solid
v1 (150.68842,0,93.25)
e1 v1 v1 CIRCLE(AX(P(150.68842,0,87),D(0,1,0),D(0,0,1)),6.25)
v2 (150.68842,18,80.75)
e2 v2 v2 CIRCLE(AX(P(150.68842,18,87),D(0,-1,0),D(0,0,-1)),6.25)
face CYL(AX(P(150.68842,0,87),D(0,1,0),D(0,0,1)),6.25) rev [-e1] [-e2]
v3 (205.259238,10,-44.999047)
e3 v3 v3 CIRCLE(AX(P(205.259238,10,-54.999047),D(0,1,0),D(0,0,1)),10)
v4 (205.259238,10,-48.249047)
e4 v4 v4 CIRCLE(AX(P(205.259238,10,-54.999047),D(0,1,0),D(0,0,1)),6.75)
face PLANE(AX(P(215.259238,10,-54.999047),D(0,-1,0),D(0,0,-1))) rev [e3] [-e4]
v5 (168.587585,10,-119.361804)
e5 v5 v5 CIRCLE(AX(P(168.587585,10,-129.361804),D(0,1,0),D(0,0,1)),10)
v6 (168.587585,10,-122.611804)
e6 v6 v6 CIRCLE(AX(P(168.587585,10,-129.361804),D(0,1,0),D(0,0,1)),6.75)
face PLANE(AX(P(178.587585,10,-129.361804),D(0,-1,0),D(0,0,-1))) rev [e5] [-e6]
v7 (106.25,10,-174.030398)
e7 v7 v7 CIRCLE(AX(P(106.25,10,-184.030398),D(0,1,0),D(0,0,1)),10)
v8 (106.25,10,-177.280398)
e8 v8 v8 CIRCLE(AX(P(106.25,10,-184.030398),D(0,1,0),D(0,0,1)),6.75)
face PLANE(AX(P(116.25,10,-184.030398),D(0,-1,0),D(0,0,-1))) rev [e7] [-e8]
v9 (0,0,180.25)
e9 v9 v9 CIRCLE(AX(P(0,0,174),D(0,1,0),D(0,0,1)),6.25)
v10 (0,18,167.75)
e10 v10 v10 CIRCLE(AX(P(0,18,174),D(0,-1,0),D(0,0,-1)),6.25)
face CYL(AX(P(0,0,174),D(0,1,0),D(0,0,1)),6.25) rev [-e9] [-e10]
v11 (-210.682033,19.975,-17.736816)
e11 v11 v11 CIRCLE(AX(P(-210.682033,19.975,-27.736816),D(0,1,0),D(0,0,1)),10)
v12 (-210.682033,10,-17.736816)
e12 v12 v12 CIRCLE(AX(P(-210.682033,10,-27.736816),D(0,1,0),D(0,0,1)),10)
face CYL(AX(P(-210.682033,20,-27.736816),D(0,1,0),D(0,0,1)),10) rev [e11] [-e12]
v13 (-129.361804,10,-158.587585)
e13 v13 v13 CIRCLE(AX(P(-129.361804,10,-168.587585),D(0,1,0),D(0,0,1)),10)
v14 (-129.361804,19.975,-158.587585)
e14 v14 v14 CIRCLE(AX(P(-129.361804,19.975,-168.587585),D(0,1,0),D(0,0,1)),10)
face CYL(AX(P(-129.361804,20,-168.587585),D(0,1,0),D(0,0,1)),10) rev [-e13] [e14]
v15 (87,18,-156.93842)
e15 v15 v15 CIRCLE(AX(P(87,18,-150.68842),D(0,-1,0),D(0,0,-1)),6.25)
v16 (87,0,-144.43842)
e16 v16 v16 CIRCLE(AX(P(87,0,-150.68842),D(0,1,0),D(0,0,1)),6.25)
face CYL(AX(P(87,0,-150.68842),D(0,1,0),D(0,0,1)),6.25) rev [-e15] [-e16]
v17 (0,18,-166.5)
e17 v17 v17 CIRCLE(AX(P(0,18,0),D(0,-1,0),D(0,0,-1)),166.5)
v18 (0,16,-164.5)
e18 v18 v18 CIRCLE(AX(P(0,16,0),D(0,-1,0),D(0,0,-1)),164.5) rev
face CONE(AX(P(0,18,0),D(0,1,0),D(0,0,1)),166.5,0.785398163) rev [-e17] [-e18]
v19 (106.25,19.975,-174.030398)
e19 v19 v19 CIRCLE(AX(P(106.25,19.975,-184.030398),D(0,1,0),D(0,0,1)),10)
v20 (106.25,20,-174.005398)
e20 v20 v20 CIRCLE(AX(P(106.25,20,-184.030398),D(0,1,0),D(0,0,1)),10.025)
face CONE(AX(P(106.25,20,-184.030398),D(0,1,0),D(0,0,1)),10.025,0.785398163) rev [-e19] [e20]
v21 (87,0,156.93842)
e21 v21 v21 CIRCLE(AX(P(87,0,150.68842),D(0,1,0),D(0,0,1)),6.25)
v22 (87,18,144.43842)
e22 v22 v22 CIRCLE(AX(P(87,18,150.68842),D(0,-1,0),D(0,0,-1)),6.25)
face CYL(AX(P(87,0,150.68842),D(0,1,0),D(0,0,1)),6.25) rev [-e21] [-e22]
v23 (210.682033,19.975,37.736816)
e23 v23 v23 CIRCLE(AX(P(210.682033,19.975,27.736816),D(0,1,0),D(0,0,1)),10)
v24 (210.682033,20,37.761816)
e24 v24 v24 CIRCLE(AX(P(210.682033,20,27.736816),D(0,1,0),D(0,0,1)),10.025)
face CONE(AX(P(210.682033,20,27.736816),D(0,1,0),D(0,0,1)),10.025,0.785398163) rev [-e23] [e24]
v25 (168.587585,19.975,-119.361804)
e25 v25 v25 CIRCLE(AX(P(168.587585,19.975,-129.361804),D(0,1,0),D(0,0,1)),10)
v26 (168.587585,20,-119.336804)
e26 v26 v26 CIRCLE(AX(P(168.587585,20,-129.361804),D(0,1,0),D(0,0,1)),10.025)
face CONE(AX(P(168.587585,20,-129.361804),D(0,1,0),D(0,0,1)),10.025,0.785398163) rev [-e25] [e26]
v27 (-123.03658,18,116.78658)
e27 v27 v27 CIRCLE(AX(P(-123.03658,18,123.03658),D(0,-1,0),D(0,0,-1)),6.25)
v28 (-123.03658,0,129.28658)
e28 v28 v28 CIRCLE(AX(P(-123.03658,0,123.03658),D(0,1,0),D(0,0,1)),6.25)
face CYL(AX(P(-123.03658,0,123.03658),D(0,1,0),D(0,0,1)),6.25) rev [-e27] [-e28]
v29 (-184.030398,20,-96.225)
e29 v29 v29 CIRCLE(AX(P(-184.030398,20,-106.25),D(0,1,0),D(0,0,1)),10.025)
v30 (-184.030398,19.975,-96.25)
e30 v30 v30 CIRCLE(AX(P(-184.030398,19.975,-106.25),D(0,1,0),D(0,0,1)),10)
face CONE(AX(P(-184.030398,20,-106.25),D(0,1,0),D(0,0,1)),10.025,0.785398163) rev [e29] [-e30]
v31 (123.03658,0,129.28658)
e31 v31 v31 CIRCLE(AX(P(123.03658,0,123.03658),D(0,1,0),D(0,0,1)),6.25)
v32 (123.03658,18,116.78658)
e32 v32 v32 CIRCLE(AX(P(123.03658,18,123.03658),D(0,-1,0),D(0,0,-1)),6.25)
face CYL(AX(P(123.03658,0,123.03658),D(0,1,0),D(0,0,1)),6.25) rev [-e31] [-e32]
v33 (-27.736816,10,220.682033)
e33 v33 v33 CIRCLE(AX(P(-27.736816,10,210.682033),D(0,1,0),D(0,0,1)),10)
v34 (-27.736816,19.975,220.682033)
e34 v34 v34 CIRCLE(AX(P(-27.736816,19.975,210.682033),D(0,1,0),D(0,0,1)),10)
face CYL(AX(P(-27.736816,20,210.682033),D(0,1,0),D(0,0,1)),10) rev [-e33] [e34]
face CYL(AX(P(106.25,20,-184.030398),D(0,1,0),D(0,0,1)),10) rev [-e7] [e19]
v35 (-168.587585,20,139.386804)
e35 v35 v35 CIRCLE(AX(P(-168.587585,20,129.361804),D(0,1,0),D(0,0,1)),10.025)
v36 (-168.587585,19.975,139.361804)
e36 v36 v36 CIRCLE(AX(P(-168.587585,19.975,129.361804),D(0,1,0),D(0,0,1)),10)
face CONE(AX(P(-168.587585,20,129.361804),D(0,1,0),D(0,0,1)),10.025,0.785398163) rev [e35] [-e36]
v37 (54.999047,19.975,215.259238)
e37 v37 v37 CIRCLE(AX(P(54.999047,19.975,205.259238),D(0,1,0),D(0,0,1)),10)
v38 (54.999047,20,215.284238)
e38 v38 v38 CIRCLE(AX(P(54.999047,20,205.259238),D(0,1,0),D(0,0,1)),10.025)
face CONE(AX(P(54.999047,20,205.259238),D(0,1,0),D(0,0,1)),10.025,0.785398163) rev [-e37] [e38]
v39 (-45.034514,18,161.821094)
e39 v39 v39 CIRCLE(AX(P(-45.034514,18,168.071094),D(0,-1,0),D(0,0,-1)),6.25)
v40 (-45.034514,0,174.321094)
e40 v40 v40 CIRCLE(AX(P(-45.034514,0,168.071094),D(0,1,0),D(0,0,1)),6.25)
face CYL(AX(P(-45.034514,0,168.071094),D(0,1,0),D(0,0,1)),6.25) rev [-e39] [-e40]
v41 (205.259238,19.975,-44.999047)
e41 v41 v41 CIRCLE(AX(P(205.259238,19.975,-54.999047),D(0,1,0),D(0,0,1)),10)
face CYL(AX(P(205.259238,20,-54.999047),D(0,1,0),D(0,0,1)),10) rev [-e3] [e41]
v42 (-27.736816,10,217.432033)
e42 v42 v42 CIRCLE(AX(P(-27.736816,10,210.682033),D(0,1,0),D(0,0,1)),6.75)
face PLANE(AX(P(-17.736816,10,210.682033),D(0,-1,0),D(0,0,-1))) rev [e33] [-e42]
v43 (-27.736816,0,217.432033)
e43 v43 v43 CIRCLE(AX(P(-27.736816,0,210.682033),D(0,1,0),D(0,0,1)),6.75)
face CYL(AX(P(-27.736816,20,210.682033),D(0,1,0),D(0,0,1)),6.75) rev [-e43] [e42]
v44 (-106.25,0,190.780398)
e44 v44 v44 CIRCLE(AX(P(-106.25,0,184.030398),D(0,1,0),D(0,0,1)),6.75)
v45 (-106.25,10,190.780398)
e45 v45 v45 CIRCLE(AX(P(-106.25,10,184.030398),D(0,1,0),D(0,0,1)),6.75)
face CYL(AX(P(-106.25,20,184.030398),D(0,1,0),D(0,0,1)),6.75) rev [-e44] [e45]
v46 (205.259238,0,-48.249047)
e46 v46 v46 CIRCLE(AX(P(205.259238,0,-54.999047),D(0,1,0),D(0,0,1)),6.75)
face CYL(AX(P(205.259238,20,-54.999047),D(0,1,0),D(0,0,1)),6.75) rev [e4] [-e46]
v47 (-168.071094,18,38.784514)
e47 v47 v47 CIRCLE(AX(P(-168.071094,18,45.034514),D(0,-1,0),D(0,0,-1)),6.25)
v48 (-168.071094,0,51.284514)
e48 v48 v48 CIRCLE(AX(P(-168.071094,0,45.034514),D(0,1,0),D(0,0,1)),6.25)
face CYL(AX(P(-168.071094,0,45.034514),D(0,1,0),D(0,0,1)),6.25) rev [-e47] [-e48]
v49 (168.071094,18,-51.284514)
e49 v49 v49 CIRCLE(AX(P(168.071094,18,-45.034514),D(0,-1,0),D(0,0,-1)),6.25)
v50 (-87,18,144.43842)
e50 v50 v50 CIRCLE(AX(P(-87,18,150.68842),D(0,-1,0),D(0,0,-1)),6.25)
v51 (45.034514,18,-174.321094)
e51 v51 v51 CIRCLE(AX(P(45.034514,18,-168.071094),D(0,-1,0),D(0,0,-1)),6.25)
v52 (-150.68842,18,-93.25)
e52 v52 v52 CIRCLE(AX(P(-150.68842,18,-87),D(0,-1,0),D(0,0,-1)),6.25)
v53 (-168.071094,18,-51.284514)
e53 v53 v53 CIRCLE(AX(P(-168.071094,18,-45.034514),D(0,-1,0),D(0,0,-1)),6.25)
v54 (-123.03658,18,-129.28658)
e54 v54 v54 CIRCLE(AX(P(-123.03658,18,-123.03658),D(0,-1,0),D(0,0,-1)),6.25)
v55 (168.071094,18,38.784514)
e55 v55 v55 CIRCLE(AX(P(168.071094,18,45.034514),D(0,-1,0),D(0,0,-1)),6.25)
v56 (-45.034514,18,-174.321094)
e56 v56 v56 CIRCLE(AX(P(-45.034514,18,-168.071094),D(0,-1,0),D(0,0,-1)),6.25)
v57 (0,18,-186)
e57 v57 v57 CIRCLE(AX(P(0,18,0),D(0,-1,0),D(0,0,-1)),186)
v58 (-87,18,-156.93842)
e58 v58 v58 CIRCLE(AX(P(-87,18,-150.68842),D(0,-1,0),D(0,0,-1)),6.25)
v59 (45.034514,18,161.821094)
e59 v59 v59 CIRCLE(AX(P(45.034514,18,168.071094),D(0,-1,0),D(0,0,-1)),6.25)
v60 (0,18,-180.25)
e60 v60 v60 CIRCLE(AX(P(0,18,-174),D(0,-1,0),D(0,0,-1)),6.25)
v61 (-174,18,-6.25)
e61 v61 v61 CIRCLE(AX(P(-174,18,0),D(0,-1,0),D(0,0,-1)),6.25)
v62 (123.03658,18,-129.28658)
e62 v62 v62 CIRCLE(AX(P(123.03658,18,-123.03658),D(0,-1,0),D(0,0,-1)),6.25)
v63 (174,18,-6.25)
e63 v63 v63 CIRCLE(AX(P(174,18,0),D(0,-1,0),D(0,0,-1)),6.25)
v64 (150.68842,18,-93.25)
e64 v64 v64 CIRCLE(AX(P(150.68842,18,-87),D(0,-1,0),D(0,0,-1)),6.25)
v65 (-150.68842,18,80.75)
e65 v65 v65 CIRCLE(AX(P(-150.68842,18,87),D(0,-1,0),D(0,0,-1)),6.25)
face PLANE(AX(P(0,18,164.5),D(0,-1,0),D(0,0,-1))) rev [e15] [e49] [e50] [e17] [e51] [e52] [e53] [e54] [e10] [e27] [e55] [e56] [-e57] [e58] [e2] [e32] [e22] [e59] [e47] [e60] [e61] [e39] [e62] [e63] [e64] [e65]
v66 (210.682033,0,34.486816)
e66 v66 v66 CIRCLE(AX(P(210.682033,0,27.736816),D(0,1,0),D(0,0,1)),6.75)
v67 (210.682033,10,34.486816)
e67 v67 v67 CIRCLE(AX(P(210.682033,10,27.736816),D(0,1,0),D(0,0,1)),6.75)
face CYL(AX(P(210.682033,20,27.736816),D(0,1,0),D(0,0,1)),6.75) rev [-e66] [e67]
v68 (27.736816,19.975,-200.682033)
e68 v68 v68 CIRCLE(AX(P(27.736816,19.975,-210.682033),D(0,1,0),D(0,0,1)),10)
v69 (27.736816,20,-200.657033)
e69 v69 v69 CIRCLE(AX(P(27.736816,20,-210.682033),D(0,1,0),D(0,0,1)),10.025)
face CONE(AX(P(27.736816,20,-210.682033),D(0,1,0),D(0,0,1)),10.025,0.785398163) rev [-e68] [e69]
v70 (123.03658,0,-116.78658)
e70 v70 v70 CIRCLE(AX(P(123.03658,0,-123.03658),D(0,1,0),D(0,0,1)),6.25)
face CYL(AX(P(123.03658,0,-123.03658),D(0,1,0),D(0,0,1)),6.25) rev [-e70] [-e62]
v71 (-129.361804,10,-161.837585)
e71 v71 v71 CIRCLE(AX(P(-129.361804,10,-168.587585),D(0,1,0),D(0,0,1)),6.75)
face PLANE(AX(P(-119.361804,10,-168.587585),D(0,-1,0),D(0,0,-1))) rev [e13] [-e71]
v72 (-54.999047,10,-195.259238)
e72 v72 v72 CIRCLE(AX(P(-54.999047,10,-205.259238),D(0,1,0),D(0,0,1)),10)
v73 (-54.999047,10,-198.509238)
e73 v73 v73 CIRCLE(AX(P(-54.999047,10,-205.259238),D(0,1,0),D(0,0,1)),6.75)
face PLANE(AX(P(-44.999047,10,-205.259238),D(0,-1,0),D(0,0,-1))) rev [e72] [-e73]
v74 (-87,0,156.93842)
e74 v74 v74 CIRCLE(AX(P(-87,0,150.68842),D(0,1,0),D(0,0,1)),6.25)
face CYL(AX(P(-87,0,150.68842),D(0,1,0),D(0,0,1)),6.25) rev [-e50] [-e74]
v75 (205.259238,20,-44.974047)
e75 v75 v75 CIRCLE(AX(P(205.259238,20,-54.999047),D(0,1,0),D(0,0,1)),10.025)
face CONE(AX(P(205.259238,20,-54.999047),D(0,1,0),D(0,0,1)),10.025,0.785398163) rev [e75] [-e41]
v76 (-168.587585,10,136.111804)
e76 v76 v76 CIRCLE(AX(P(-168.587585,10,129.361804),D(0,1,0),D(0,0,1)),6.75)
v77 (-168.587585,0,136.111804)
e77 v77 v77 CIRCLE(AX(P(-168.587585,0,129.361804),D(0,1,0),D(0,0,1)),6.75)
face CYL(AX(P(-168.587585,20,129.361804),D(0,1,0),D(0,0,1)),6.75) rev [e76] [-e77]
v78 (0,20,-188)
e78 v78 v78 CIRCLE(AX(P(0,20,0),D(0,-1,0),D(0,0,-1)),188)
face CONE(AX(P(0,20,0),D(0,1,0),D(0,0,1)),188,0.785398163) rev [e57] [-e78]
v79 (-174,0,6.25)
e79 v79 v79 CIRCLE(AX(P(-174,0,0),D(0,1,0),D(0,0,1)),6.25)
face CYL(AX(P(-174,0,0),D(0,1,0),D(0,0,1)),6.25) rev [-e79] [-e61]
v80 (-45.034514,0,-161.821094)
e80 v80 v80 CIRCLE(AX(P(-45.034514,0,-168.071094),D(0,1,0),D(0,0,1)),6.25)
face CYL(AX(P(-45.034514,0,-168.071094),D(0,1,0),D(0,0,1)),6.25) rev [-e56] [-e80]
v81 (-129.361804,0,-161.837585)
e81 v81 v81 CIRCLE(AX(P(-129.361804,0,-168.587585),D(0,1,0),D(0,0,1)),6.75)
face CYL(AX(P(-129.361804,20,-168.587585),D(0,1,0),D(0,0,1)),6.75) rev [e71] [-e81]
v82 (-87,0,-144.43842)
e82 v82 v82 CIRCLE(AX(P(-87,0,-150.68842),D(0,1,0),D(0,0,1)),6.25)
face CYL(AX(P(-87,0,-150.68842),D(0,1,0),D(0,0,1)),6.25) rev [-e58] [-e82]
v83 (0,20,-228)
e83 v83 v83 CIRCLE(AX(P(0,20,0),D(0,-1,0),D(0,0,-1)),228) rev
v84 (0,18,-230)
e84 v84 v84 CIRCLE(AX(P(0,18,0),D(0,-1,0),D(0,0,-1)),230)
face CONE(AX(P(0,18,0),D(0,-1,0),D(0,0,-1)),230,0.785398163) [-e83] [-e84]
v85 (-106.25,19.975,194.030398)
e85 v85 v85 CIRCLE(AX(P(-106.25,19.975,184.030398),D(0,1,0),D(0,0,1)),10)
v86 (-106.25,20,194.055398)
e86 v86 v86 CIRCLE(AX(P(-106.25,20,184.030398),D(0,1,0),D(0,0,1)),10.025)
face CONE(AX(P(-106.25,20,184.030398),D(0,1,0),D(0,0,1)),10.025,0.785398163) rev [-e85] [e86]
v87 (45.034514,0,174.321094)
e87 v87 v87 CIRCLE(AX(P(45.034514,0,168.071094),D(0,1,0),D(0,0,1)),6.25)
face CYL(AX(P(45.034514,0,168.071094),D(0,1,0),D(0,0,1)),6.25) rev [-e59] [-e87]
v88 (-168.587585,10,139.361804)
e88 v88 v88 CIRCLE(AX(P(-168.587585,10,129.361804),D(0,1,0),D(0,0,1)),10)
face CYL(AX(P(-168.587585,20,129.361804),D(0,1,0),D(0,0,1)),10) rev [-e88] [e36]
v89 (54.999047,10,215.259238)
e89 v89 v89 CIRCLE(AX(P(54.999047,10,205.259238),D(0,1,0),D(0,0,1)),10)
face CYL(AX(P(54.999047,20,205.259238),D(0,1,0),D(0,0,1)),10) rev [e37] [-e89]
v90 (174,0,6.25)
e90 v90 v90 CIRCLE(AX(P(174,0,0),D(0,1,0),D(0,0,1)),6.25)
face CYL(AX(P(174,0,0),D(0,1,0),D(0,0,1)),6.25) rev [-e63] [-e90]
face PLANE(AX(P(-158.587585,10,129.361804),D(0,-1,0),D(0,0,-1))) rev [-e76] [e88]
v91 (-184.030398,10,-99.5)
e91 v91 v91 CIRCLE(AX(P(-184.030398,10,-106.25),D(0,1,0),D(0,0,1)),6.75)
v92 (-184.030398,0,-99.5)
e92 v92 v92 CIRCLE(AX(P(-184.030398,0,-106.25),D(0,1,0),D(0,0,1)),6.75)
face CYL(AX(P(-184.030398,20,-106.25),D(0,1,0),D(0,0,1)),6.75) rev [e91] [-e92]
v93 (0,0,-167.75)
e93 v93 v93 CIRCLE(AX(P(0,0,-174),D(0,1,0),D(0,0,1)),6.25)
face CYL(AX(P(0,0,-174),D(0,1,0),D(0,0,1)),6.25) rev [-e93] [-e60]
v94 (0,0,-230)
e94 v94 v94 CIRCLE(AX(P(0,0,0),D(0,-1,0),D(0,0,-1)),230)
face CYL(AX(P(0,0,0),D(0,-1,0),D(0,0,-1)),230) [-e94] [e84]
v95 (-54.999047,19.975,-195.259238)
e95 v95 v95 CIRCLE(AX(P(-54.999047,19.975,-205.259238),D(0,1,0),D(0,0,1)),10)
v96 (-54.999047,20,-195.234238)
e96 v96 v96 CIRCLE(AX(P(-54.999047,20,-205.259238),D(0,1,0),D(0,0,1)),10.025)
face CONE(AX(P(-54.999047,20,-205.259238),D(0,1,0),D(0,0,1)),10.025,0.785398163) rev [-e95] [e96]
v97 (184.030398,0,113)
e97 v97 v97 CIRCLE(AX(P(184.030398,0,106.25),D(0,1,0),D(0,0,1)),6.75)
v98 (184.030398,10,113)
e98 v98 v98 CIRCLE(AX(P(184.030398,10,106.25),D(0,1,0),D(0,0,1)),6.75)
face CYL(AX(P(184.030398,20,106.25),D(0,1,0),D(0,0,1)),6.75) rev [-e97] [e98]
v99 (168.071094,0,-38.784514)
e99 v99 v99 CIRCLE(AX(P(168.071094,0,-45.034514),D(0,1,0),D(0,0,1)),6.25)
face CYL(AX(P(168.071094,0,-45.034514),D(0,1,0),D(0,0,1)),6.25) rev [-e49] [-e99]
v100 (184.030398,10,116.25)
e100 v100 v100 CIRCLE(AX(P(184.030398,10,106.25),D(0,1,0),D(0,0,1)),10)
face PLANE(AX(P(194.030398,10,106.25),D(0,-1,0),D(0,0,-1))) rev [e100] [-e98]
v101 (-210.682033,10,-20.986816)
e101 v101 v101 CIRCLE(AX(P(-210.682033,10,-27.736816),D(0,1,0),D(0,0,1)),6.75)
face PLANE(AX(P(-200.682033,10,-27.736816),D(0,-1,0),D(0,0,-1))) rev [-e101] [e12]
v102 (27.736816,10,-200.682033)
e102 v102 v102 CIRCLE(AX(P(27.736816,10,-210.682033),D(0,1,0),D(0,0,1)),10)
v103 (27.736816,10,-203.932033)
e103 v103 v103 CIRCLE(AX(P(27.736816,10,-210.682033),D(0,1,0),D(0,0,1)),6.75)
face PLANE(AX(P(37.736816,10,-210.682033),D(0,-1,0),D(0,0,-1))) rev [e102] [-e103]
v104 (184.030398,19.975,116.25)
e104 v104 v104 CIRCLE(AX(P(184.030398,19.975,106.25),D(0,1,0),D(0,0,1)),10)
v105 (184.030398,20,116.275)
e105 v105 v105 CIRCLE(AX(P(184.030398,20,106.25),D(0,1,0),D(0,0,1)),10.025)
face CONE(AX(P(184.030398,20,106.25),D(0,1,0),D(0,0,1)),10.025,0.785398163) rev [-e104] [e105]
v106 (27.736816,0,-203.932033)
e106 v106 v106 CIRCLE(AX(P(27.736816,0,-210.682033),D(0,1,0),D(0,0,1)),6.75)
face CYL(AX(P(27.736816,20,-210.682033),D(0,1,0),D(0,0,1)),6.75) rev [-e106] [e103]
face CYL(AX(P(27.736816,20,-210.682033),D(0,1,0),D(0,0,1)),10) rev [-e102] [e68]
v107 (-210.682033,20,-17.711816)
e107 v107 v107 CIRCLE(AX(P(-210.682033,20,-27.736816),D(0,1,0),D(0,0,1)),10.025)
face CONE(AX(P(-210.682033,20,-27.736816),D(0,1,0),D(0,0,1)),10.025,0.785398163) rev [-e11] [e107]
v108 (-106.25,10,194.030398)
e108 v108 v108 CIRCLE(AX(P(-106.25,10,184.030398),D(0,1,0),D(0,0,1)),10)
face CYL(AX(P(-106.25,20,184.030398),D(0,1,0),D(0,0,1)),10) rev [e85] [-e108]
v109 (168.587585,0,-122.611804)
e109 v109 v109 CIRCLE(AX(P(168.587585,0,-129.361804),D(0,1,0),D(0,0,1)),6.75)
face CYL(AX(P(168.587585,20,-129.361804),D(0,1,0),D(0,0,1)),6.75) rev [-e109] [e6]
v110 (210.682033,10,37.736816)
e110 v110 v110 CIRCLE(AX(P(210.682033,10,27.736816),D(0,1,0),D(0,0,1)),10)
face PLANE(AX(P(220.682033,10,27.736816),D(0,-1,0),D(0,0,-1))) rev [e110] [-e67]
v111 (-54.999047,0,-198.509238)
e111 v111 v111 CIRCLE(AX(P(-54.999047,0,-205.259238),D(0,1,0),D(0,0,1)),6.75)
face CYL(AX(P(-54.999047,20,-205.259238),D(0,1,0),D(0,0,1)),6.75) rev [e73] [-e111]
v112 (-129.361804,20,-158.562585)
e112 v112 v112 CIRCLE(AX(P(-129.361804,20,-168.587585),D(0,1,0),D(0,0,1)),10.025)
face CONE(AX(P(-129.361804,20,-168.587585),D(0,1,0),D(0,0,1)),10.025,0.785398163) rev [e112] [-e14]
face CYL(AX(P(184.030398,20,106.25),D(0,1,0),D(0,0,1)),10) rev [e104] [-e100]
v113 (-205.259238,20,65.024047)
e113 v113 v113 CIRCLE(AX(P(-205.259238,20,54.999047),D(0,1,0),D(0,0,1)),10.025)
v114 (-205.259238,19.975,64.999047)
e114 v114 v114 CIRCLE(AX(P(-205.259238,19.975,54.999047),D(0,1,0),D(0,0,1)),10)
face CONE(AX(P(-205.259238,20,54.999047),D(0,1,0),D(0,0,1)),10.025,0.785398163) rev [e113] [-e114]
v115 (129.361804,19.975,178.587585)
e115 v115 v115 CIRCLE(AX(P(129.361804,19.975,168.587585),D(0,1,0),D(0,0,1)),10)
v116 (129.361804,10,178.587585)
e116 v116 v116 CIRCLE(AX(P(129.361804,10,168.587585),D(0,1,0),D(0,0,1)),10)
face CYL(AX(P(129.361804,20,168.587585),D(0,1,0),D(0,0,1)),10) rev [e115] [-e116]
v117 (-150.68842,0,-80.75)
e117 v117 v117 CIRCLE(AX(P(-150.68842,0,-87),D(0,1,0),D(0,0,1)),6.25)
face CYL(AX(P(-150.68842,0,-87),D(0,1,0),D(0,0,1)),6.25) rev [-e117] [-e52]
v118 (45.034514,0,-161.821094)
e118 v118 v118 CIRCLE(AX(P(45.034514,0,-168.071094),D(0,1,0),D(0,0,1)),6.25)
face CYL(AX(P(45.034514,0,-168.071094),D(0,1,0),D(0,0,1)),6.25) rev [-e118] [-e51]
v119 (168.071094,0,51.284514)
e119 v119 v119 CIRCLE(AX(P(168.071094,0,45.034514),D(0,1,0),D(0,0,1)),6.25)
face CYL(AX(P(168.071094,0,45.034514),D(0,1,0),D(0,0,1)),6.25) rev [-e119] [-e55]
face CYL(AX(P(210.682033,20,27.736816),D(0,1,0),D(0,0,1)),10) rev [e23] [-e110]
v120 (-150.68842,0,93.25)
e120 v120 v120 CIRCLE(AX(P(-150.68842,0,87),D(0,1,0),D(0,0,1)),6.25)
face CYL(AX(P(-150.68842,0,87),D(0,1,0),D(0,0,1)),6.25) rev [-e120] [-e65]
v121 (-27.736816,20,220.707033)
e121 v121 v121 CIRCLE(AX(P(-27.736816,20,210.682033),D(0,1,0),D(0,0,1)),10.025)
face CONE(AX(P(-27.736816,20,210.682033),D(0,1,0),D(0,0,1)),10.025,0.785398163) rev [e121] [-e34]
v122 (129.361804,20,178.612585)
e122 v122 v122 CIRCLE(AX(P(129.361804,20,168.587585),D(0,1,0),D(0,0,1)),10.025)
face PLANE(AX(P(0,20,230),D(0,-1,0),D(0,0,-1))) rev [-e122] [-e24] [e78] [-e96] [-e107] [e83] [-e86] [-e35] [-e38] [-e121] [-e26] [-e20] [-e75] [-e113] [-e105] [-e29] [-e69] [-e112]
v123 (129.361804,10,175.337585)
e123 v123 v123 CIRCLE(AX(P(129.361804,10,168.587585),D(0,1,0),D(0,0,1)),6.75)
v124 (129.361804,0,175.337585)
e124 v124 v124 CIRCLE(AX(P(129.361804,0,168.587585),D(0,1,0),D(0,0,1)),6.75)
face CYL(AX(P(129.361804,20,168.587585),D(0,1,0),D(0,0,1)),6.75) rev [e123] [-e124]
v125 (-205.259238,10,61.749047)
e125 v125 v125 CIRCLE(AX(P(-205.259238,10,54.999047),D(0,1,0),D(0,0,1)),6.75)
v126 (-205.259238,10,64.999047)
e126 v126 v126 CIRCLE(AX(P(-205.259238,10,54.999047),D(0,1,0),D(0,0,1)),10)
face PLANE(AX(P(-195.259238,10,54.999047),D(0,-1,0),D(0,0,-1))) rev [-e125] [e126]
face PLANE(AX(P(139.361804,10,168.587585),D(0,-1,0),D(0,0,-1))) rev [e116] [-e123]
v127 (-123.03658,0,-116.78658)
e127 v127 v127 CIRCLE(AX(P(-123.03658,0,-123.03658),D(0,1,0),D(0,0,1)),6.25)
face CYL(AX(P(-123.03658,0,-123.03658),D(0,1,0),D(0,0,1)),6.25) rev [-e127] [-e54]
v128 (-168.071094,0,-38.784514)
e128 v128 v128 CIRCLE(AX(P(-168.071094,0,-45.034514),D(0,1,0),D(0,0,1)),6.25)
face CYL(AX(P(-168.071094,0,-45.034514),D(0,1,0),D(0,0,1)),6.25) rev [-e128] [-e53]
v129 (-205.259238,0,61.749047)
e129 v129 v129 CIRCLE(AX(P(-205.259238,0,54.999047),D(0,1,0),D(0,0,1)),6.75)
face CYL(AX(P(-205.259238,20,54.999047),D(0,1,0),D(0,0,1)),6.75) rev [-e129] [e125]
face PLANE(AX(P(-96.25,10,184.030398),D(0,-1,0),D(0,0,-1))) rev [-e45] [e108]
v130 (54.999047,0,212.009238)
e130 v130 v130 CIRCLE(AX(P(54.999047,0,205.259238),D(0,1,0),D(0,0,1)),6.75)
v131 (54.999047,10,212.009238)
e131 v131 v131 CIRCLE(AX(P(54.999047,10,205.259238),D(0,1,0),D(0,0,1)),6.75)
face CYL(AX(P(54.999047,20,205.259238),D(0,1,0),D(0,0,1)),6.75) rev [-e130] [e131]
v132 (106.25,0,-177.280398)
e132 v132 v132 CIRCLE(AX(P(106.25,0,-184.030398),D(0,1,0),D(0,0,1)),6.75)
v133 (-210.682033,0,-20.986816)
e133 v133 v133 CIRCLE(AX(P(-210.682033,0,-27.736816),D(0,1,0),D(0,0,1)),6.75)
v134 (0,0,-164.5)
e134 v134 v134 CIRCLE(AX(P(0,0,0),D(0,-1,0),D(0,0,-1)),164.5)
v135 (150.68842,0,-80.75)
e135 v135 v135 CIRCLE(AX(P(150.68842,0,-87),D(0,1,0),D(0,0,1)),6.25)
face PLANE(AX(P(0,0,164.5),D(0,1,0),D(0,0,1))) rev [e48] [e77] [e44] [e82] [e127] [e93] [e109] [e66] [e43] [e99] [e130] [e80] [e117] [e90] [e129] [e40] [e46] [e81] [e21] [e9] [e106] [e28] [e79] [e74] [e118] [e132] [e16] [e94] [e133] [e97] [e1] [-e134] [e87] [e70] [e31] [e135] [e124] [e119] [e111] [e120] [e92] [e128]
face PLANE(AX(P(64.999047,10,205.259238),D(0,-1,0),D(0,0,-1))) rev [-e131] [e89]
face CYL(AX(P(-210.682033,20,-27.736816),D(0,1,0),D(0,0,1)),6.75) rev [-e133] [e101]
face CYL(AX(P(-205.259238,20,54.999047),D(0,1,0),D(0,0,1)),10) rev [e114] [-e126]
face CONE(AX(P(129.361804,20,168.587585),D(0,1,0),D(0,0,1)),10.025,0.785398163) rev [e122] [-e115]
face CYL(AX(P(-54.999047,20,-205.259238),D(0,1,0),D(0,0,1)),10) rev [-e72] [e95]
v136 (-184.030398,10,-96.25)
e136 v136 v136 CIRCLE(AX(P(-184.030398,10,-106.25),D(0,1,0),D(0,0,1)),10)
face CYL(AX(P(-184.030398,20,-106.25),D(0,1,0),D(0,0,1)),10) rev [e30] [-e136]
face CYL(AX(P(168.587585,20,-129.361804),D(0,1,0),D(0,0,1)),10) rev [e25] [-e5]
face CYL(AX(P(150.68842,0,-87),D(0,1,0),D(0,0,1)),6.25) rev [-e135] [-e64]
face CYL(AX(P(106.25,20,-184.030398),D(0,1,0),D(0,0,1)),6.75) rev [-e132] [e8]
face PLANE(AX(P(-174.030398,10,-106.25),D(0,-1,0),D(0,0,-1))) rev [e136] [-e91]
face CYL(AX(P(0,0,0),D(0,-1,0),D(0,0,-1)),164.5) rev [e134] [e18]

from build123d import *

# Parameters (mm, degrees)
SKETCH2_R          = 6.25
CUT_EXTRUDE3_DEPTH = 20
CIRPATTERN1_COUNT  = 16
CHAMFER1_SIZE      = 2


with BuildPart() as part:
    # Sketch1 → Revolve1 (revolve)
    with BuildSketch(Plane(origin=(0, 0, 0), x_dir=(0, 0, -1), z_dir=(1, 0, 0)), mode=Mode.PRIVATE) as revolve1_sk:
        Polygon((-164.5, 0), (-230, 0), (-230, 20), (-186, 20), (-186, 18), (-164.5, 18), align=None)
    revolve(revolve1_sk.sketch.rotate(Axis((0, 0, 0), (0, 1, 0)), 180), axis=Axis((0, 0, 0), (0, 1, 0)))

    # Sketch2 → Cut-Extrude3 (cut)
    with BuildSketch(Plane(origin=(0, 20, 0), x_dir=(1, 0, 0), z_dir=(0, 1, 0))):
        with Locations(Location((0, 174, 0), (0, 0, 270))):
            Circle(SKETCH2_R)
        with Locations(Location((45.034513848, 168.071093774, 0), (0, 0, 270))):
            Circle(SKETCH2_R)
        with Locations(Location((87, 150.688420258, 0), (0, 0, 270))):
            Circle(SKETCH2_R)
        with Locations(Location((123.036579926, 123.036579926, 0), (0, 0, 270))):
            Circle(SKETCH2_R)
        with Locations(Location((150.688420258, 87, 0), (0, 0, 270))):
            Circle(SKETCH2_R)
        with Locations(Location((168.071093774, 45.034513848, 0), (0, 0, 270))):
            Circle(SKETCH2_R)
        with Locations(Location((174, 0, 0), (0, 0, 270))):
            Circle(SKETCH2_R)
        with Locations(Location((168.071093774, -45.034513848, 0), (0, 0, 270))):
            Circle(SKETCH2_R)
        with Locations(Location((150.688420258, -87, 0), (0, 0, 270))):
            Circle(SKETCH2_R)
        with Locations(Location((123.036579926, -123.036579926, 0), (0, 0, 270))):
            Circle(SKETCH2_R)
        with Locations(Location((87, -150.688420258, 0), (0, 0, 270))):
            Circle(SKETCH2_R)
        with Locations(Location((45.034513848, -168.071093774, 0), (0, 0, 270))):
            Circle(SKETCH2_R)
        with Locations(Location((0, -174, 0), (0, 0, 270))):
            Circle(SKETCH2_R)
        with Locations(Location((-45.034513848, -168.071093774, 0), (0, 0, 270))):
            Circle(SKETCH2_R)
        with Locations(Location((-87, -150.688420258, 0), (0, 0, 270))):
            Circle(SKETCH2_R)
        with Locations(Location((-123.036579926, -123.036579926, 0), (0, 0, 270))):
            Circle(SKETCH2_R)
        with Locations(Location((-150.688420258, -87, 0), (0, 0, 270))):
            Circle(SKETCH2_R)
        with Locations(Location((-168.071093774, -45.034513848, 0), (0, 0, 270))):
            Circle(SKETCH2_R)
        with Locations(Location((-174, 0, 0), (0, 0, 270))):
            Circle(SKETCH2_R)
        with Locations(Location((-168.071093774, 45.034513848, 0), (0, 0, 270))):
            Circle(SKETCH2_R)
        with Locations(Location((-150.688420258, 87, 0), (0, 0, 270))):
            Circle(SKETCH2_R)
        with Locations(Location((-123.036579926, 123.036579926, 0), (0, 0, 270))):
            Circle(SKETCH2_R)
        with Locations(Location((-87, 150.688420258, 0), (0, 0, 270))):
            Circle(SKETCH2_R)
        with Locations(Location((-45.034513848, 168.071093774, 0), (0, 0, 270))):
            Circle(SKETCH2_R)
    extrude(amount=-CUT_EXTRUDE3_DEPTH, mode=Mode.SUBTRACT)

    # Sketch7 → CBORE for M12 SHCS1 (revolve, cut)
    with BuildSketch(Plane(origin=(27.736815847, 20, -210.682033042), x_dir=(0, 0, 1), z_dir=(1, 0, 0))):
        Polygon((0, 0), (0, 20), (6.75, 20), (6.75, 10), (10, 10), (10, 0.025), (10.025, 0), align=None)
    cbore_for_m12_shcs1 = revolve(axis=Axis((27.736815847, 26.35, -210.682033042), (0, -1, 0)), mode=Mode.SUBTRACT)

    # CirPattern1: CBORE for M12 SHCS1 ×16 about axis
    cirpattern1_axis = Axis((0, 0, 0), (0, 1, 0))
    for i in range(1, CIRPATTERN1_COUNT):
        add(cbore_for_m12_shcs1.rotate(cirpattern1_axis, i * 360 / CIRPATTERN1_COUNT), mode=Mode.SUBTRACT)

    # Chamfer1
    chamfer1_edges = [part.edges().sort_by_distance(p)[0] for p in [
        (0, 20, 186),
        (0, 20, 230),
        (0, 18, 164.5),
    ]]
    chamfer(chamfer1_edges, length=CHAMFER1_SIZE - 0.0001)  # a hair under: the kernel refuses the full size


solid = part.part
